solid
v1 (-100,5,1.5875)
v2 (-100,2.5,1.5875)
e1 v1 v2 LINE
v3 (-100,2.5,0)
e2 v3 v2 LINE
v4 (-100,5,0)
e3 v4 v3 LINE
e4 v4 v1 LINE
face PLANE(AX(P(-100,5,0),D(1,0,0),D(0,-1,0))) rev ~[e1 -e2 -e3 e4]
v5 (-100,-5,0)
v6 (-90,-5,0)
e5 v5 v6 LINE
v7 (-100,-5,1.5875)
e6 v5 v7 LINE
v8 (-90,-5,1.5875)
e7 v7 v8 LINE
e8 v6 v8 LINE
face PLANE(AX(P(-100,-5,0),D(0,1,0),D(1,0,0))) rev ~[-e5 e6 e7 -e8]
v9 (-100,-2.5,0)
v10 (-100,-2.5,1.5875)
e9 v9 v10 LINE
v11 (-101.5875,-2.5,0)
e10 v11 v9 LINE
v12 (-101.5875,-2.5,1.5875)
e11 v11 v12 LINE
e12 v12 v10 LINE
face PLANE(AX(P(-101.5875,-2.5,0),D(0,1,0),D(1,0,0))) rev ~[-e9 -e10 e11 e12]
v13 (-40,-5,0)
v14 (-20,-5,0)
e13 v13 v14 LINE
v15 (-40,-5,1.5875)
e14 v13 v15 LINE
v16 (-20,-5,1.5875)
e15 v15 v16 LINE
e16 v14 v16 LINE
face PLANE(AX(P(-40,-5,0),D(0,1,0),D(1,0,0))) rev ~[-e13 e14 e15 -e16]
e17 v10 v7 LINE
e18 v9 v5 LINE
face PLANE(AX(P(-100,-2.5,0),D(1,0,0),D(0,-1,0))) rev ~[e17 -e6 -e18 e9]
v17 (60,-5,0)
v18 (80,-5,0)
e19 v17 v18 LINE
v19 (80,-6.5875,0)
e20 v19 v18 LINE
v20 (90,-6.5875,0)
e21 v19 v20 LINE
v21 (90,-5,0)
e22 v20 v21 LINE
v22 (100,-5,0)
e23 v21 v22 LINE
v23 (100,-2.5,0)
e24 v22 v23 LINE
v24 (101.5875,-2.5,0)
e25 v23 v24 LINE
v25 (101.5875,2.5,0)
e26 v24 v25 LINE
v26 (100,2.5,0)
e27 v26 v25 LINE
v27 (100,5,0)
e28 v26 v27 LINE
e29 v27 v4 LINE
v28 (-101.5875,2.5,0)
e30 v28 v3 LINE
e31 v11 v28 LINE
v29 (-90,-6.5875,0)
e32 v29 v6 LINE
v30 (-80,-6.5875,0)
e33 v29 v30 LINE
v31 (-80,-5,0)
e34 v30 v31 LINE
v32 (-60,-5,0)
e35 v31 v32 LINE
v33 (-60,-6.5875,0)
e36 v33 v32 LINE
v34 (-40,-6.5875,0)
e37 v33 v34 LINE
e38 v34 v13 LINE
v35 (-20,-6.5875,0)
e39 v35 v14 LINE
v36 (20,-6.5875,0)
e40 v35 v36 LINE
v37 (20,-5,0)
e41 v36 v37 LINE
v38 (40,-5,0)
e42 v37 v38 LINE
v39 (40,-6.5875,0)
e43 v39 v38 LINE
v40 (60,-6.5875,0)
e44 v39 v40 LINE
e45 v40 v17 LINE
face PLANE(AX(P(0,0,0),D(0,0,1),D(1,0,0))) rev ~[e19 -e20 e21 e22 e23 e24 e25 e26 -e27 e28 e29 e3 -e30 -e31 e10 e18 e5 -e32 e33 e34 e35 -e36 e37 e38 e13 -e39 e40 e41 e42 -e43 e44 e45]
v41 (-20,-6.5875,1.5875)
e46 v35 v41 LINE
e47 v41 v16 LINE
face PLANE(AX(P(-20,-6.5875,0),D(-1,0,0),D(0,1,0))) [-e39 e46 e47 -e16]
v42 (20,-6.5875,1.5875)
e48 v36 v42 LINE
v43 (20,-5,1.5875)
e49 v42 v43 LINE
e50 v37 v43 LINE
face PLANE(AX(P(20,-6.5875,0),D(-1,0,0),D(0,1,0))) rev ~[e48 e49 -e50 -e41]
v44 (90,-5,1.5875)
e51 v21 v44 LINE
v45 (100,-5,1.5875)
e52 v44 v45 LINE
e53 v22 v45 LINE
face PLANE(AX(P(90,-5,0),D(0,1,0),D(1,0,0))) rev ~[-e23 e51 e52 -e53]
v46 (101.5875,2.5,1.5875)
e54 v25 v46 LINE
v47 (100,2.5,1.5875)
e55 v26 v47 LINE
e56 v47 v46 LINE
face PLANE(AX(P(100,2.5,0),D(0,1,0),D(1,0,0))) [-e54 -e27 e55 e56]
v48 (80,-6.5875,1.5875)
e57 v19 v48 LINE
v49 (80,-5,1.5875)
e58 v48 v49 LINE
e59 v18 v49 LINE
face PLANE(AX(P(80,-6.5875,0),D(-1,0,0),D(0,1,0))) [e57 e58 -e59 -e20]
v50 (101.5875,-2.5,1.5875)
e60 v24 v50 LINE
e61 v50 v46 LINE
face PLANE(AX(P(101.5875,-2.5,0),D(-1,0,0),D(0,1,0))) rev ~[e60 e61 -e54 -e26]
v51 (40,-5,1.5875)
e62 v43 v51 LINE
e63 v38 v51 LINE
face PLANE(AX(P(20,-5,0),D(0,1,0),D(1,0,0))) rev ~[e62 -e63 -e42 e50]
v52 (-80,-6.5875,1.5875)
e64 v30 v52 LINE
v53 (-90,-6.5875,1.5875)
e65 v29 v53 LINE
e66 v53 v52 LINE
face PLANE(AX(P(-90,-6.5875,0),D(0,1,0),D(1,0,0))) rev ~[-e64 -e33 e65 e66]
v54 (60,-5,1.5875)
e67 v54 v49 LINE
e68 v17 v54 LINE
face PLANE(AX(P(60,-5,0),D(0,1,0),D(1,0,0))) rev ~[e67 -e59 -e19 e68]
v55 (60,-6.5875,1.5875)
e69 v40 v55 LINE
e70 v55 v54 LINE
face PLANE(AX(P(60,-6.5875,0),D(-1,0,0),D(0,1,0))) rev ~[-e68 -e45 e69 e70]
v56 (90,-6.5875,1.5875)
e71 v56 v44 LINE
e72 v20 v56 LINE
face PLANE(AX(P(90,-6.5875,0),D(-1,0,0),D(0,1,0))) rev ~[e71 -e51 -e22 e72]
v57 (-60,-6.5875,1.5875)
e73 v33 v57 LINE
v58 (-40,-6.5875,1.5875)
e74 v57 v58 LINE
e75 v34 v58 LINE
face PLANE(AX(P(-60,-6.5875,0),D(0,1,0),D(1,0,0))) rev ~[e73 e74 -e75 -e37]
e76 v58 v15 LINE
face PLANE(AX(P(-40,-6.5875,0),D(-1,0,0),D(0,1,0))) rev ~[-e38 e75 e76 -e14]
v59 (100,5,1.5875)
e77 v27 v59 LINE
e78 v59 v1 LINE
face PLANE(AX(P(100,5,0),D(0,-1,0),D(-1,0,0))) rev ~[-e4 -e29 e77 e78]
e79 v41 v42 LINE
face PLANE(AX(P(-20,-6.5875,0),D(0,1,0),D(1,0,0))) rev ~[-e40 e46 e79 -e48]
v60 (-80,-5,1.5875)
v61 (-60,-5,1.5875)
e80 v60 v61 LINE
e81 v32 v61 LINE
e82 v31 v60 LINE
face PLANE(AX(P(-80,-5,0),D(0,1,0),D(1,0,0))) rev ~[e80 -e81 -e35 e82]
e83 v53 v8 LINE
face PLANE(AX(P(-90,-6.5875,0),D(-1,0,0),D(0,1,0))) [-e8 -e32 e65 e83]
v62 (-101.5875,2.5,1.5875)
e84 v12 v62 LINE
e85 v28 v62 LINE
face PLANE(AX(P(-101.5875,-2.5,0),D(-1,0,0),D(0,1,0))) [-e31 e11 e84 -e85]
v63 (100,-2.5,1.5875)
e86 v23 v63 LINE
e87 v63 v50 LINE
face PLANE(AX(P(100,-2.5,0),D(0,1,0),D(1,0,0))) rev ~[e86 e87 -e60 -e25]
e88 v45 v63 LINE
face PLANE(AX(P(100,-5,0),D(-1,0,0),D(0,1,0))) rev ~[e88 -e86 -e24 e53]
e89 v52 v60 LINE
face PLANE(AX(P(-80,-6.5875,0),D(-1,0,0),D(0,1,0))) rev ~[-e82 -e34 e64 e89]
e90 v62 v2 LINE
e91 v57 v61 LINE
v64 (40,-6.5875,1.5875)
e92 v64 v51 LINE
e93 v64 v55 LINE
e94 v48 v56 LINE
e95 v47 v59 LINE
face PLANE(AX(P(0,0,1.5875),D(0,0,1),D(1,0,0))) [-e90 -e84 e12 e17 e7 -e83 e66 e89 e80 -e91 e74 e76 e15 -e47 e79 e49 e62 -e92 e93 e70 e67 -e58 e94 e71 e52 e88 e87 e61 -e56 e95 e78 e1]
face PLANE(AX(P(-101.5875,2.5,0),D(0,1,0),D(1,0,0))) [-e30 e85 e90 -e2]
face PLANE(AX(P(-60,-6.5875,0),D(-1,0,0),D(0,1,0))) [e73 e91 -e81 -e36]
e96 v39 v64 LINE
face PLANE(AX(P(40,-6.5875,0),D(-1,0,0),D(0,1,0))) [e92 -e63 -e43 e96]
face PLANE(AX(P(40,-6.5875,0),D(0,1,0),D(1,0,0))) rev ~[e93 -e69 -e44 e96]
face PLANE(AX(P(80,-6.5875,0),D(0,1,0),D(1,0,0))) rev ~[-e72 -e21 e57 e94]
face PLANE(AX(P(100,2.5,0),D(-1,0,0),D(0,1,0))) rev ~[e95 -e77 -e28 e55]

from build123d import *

# Parameters (mm, degrees)
F0_W     = 10
F0_H     = 1.5875
F0_W_2   = 1.5875
F0_H_2   = 5
F0_W_3   = 20
F0_W_4   = 40
F1_DEPTH = 1.5875


# Not quite as in the source:
# - a length typed as a fraction of an inch, garbled in the dataset ("3 / 203.2 mm" for 3/8 in), is restored


with BuildPart() as f1:
    # F0 (on Top) → F1 (new body)
    with BuildSketch(Plane.XY):
        Polygon((-100, -2.5), (-100, -5), (-90, -5), (-80, -5), (-60, -5), (-40, -5), (-20, -5), (20, -5), (40, -5), (60, -5), (80, -5), (90, -5), (100, -5), (100, -2.5), (100, 2.5), (100, 5), (-100, 5), (-100, 2.5), align=None)
        with Locations((-85, -5.79375)):
            Rectangle(F0_W, F0_H)
        with Locations((-100.79375, 0)):
            Rectangle(F0_W_2, F0_H_2)
        with Locations((-50, -5.79375)):
            Rectangle(F0_W_3, F0_H)
        with Locations((0, -5.79375)):
            Rectangle(F0_W_4, F0_H)
        with Locations((100.79375, 0)):
            Rectangle(F0_W_2, F0_H_2)
        with Locations((50, -5.79375)):
            Rectangle(F0_W_3, F0_H)
        with Locations((85, -5.79375)):
            Rectangle(F0_W, F0_H)
    extrude(amount=F1_DEPTH)


solid = f1.part
